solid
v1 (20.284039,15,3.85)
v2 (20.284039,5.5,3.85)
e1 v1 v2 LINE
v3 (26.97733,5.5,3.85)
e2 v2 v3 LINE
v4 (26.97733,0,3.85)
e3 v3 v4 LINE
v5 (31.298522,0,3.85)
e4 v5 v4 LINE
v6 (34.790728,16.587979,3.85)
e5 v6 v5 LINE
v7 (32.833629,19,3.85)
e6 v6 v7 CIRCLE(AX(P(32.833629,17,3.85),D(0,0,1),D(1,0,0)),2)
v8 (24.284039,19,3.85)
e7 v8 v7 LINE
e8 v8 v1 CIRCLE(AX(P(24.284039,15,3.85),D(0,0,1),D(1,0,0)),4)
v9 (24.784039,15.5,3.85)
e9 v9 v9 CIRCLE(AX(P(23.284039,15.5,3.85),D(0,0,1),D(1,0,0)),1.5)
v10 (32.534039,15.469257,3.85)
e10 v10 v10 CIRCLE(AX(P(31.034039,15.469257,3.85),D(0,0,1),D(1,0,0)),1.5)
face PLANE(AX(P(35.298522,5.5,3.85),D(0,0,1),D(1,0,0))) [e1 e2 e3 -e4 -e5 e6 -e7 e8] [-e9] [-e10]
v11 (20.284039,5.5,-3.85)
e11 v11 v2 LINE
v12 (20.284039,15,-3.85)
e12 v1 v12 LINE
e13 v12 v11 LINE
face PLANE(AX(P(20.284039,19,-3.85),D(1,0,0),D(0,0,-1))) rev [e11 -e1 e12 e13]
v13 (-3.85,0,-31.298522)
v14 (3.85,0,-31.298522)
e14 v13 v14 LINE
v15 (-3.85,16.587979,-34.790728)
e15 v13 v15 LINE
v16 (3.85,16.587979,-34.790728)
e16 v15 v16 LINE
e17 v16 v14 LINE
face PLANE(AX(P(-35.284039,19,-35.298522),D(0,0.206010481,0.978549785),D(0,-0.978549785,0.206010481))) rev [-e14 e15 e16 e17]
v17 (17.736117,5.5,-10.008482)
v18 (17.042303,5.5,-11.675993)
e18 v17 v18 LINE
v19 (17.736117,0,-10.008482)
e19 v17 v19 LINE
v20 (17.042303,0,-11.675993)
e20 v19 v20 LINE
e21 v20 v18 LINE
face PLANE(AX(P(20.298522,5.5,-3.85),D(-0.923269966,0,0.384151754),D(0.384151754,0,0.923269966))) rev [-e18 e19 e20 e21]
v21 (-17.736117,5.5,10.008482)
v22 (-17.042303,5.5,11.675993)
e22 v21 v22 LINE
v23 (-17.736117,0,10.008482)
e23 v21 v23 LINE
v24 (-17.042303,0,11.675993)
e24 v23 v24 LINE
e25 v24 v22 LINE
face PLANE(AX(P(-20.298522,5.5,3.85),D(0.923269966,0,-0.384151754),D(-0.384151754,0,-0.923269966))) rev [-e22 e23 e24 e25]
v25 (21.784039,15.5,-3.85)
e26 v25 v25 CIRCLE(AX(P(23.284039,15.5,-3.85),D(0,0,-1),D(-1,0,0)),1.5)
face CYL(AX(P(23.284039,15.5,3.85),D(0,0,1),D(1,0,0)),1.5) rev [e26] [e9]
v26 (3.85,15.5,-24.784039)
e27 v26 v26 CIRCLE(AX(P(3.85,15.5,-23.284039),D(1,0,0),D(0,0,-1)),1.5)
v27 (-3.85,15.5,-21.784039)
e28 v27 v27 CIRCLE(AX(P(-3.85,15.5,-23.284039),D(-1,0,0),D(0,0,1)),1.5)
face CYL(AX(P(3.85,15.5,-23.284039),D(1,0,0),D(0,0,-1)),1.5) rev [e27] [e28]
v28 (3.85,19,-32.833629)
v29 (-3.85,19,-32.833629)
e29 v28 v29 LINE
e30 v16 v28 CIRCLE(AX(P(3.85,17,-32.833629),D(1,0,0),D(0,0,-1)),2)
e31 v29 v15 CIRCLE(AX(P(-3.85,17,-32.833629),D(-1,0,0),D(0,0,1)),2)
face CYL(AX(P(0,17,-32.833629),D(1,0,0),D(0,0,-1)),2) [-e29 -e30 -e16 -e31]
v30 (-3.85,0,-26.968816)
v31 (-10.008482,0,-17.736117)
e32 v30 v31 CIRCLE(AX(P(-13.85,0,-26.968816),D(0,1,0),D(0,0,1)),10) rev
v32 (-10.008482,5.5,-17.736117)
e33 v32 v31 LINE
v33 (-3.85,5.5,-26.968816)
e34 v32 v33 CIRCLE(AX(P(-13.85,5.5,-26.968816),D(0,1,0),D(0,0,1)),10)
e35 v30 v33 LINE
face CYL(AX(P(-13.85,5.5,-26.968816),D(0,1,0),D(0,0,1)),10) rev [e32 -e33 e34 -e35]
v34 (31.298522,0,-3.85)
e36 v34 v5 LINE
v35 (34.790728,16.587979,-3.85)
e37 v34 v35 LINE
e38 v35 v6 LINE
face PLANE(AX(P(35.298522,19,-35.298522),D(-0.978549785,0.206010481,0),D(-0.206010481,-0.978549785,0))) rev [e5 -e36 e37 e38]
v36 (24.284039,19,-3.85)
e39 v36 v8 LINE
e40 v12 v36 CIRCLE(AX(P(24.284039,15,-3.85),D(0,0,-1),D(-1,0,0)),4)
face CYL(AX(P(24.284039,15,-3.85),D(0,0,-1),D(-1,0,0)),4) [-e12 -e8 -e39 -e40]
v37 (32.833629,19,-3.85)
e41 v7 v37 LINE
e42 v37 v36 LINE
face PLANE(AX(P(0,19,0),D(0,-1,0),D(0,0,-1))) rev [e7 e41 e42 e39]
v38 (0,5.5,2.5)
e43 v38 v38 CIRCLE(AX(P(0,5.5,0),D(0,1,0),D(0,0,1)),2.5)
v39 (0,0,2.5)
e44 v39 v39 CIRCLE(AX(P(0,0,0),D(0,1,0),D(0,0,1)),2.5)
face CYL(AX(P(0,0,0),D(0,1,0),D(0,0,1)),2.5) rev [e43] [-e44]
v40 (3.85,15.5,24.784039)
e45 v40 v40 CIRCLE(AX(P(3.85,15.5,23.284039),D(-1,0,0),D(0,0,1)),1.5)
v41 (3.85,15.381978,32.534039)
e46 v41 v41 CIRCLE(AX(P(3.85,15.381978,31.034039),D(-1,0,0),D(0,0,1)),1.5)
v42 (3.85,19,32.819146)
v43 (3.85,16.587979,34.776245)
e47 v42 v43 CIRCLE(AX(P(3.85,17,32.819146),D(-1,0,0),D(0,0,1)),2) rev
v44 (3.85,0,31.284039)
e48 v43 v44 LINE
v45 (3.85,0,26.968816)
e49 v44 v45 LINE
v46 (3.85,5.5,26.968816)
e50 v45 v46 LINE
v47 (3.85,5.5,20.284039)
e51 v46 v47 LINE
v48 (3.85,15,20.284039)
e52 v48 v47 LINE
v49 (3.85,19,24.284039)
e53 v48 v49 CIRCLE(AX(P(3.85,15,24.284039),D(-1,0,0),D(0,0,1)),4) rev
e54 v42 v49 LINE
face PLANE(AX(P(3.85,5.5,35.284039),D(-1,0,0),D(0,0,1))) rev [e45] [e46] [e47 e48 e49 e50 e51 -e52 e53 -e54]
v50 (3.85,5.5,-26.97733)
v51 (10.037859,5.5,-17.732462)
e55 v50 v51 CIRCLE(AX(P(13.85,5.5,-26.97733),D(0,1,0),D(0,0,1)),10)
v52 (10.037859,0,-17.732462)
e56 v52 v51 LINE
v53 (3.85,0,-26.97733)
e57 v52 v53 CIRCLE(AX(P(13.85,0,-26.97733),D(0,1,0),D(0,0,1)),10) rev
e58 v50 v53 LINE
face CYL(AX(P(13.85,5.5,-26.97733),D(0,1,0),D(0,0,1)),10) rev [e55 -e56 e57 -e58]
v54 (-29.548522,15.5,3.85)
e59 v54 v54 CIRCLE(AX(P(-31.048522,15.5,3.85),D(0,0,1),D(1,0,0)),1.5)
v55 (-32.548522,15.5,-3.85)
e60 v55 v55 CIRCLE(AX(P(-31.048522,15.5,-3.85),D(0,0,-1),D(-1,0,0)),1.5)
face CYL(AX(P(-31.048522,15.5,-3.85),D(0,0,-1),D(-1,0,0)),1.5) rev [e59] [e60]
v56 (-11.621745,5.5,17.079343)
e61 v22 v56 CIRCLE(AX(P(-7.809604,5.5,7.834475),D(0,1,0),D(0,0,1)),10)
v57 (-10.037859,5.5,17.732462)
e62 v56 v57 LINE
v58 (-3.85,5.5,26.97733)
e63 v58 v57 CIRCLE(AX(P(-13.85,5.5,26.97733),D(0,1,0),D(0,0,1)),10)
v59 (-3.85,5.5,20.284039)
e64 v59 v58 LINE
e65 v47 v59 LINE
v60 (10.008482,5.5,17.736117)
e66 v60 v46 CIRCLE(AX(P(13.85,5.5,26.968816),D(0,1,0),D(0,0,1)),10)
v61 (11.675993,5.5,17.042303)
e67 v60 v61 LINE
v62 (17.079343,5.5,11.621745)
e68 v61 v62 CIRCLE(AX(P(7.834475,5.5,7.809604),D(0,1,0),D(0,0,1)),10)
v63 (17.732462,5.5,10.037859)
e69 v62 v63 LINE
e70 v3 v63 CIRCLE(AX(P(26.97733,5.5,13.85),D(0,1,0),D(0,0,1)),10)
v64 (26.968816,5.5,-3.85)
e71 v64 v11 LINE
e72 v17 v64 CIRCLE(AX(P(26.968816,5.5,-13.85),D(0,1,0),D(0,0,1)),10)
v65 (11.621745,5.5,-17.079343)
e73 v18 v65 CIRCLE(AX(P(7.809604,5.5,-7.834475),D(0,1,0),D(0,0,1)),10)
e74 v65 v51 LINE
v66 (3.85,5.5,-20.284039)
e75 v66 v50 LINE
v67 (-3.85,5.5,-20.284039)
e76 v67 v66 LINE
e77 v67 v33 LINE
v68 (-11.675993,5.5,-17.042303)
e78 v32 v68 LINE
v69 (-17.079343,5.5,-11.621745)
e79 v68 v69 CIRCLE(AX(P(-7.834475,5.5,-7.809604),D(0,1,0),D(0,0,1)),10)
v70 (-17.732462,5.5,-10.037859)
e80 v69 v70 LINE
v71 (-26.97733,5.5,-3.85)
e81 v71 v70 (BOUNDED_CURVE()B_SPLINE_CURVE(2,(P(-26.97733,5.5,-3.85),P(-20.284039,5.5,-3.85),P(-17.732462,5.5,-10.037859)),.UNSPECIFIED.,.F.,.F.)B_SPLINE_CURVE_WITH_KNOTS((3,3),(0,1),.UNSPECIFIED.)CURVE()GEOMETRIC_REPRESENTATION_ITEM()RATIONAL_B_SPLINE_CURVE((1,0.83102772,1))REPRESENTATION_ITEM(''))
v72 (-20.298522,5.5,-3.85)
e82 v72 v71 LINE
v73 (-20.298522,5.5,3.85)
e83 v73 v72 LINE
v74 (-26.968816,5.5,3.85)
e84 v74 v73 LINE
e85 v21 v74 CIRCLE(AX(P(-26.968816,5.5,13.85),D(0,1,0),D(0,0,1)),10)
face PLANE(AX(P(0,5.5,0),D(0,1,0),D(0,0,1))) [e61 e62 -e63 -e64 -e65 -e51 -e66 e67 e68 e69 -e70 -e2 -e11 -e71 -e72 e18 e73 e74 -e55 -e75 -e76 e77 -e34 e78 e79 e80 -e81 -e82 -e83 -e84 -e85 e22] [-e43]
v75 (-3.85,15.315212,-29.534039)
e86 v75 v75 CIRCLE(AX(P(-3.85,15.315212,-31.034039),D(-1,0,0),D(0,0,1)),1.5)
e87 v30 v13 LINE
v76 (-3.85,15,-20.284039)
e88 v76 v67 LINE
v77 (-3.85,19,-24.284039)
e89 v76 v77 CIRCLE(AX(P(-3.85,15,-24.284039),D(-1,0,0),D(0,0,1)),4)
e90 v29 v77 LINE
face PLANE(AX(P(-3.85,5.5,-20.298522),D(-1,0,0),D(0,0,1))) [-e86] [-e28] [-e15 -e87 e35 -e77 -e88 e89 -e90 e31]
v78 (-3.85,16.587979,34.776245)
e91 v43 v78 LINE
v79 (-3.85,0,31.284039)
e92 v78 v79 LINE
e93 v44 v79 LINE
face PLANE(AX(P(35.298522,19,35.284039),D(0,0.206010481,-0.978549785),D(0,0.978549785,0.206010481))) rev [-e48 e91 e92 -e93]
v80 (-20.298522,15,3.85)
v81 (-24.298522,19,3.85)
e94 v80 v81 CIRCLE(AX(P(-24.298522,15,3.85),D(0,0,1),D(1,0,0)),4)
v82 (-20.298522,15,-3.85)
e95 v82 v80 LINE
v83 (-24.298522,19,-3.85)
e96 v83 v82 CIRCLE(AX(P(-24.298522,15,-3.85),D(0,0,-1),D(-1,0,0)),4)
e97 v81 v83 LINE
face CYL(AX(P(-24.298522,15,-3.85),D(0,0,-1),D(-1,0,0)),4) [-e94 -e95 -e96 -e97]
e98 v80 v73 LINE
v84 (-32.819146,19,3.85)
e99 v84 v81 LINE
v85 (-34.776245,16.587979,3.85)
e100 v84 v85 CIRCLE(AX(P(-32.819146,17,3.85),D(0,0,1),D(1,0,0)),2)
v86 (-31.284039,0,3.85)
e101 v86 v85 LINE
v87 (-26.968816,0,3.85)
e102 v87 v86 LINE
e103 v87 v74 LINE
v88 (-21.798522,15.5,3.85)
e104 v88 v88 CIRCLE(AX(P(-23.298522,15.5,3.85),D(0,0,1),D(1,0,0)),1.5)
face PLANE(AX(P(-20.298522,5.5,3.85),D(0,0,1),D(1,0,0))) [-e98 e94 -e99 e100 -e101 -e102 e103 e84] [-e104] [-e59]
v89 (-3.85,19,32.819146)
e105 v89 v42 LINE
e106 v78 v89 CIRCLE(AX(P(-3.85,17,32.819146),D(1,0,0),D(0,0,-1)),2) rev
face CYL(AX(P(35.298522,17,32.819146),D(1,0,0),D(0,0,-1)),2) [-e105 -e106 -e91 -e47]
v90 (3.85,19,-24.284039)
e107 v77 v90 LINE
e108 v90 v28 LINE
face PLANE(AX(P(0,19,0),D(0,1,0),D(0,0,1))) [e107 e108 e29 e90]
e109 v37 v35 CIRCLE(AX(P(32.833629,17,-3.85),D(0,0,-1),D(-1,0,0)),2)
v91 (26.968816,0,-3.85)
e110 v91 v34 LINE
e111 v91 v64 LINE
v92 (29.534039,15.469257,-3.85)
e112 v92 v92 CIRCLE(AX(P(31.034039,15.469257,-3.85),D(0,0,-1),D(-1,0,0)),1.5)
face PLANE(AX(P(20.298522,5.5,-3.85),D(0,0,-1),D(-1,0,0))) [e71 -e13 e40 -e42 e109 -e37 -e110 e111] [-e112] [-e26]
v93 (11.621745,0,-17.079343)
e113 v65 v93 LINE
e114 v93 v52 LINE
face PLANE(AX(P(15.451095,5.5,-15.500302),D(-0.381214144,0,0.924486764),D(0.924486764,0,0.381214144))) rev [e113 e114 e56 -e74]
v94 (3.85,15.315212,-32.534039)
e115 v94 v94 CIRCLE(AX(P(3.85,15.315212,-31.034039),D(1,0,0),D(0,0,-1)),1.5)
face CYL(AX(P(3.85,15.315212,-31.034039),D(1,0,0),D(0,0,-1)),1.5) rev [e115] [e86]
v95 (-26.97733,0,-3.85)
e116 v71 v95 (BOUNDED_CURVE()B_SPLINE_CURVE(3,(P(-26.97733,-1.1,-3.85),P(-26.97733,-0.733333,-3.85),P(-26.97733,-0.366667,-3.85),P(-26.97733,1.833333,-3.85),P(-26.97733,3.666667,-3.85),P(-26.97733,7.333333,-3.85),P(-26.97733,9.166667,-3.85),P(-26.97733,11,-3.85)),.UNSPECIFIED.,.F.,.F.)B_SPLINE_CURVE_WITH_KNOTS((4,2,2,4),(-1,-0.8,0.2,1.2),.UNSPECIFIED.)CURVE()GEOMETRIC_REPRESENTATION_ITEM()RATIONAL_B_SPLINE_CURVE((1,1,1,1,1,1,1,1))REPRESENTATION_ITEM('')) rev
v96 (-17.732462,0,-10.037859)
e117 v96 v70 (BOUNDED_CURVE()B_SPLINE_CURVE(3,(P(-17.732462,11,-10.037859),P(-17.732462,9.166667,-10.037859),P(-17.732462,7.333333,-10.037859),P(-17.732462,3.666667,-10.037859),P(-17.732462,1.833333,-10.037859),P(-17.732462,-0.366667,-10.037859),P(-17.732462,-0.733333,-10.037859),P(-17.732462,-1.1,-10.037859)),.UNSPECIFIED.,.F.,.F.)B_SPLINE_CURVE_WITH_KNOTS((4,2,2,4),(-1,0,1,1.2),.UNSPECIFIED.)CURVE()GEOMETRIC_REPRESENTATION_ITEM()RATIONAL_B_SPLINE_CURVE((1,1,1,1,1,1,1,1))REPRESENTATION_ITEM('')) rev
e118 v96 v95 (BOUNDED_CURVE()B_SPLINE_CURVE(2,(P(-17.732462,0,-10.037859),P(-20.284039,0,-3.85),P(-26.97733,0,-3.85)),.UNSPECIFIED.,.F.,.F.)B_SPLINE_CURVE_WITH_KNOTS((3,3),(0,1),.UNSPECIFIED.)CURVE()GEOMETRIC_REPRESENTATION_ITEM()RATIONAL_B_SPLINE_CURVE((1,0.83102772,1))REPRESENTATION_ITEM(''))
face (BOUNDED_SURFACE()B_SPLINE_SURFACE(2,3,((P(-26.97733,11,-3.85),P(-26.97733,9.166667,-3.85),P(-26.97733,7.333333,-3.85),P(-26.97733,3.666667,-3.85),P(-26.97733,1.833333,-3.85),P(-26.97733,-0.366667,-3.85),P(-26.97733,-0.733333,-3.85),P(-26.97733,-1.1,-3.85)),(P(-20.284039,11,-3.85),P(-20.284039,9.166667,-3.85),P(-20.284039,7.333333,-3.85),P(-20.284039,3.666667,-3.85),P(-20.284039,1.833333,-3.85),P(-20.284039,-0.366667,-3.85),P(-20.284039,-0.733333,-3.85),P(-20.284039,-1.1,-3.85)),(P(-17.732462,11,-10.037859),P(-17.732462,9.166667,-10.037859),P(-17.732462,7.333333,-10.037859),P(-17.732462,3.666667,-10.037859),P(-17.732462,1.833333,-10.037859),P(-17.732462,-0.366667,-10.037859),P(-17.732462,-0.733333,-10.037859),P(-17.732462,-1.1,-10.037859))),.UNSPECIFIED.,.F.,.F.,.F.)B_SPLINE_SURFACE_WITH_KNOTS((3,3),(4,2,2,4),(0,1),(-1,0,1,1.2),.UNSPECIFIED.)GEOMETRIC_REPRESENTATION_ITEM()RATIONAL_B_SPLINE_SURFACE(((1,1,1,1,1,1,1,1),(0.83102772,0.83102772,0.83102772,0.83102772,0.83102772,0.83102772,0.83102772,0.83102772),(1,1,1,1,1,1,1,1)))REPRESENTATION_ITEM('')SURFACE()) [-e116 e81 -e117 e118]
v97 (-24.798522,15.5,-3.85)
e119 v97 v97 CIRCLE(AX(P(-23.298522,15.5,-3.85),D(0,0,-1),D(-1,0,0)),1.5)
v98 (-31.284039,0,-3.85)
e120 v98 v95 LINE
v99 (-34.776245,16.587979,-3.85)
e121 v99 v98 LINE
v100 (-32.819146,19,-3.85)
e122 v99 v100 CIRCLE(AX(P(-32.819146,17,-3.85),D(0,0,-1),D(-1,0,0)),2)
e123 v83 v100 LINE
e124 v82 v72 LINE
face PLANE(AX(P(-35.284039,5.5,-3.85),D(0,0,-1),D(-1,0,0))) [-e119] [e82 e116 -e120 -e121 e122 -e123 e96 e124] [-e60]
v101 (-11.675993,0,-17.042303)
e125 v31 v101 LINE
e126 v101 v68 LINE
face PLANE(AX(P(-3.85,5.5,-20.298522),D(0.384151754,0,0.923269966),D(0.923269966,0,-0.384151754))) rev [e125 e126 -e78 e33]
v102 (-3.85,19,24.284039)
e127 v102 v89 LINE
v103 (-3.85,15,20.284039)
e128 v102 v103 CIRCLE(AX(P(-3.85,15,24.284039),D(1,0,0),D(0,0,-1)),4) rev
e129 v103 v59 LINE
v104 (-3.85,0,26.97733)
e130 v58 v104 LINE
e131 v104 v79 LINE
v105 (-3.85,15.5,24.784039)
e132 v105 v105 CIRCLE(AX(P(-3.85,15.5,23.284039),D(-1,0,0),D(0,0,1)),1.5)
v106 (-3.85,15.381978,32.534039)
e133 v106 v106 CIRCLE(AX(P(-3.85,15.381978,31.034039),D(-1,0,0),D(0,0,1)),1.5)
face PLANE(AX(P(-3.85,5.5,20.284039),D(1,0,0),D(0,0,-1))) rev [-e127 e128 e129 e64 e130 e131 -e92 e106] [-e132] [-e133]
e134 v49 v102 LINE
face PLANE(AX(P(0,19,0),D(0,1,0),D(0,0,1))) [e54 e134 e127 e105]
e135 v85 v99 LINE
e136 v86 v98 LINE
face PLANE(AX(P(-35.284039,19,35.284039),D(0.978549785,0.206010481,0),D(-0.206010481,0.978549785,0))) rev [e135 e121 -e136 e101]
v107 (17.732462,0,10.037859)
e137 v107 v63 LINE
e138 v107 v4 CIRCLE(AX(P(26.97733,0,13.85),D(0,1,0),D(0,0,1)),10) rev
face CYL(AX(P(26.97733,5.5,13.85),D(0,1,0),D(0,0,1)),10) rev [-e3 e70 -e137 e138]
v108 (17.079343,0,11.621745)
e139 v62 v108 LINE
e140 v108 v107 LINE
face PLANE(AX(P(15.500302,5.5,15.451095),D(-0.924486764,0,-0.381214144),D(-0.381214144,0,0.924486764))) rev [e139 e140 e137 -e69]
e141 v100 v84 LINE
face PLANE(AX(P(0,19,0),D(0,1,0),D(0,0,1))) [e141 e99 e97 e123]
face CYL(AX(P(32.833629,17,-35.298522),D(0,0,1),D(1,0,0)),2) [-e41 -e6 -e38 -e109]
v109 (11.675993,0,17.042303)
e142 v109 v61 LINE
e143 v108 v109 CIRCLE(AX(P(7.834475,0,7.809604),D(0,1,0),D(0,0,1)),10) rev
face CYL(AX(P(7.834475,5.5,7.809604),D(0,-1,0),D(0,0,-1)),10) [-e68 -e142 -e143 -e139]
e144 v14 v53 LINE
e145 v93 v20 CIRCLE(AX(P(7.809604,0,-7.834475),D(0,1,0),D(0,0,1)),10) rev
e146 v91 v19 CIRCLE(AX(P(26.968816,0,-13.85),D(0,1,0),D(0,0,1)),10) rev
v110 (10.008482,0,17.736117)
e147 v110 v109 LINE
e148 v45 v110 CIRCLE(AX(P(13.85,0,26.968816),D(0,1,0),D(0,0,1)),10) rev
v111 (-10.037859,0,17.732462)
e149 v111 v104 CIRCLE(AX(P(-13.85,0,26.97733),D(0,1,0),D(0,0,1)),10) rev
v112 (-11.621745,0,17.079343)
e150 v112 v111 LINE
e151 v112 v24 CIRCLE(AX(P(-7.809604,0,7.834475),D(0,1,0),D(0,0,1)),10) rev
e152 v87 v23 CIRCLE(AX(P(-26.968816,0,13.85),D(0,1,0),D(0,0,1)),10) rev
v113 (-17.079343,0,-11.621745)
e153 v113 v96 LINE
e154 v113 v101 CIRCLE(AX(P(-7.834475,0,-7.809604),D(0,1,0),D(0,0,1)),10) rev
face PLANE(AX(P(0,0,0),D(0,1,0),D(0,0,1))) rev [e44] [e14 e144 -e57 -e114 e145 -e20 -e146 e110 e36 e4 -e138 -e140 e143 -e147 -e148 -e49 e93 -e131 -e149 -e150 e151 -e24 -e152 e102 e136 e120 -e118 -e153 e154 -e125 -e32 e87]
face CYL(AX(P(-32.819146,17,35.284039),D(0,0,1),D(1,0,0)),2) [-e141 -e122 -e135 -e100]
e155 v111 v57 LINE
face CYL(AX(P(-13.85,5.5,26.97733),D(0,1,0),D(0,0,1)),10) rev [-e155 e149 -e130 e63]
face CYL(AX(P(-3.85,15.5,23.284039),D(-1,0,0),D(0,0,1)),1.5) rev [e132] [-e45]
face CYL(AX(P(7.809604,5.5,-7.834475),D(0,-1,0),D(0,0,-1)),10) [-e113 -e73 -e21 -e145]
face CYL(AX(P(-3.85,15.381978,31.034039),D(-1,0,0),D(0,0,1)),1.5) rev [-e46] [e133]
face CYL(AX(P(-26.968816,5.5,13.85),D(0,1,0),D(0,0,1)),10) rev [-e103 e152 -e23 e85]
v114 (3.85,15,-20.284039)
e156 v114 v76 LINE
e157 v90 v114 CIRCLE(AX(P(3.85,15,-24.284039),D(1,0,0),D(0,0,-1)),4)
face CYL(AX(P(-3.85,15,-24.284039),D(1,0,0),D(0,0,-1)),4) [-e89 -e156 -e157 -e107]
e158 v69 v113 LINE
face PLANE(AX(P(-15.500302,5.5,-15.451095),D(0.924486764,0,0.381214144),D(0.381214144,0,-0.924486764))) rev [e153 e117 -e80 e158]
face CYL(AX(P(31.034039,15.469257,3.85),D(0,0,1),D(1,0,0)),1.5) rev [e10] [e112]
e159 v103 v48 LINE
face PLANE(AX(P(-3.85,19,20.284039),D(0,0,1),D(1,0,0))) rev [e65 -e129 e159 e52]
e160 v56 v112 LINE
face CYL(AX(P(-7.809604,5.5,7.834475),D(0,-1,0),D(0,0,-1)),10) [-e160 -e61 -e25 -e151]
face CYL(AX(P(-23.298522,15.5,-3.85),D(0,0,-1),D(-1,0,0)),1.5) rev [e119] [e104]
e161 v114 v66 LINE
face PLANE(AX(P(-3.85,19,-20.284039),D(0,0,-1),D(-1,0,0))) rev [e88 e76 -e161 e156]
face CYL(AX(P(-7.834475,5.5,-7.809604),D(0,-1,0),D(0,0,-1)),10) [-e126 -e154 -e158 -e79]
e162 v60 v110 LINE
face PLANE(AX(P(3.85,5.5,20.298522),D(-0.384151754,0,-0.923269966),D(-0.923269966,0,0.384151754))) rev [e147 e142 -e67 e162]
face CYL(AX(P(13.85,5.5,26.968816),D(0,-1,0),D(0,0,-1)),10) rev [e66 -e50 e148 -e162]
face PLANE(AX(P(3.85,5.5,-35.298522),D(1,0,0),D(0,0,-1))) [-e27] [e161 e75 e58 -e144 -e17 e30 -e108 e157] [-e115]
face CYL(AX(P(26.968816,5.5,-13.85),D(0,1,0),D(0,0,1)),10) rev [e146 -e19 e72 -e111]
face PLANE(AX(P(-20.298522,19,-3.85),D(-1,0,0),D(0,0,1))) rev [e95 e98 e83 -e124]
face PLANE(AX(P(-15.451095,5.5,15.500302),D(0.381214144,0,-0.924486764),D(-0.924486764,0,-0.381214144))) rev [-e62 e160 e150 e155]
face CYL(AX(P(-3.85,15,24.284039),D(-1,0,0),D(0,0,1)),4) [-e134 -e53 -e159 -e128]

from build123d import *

# Parameters (mm, degrees)
BOSS_EXTRUSION_DEPTH     = 5.5
SCHIZZO2_W               = 14.985516936
SCHIZZO2_H               = 7.7
SCHIZZO2_W_2             = 7.7
SCHIZZO2_H_2             = 15.014483064
SCHIZZO2_W_3             = 15.014483064
SCHIZZO2_H_3             = 15
EXTERNAL_EXTRUSION_DEPTH = 13.5
SCHIZZO3_R               = 2.5
CETRAL_HOLE_DEPTH        = 52.71287379
TAGLIO_ESTRUSIONE2_DEPTH = 57.032066134
TAGLIO_ESTRUSIONE3_DEPTH = 57.021948056
TAGLIO_ESTRUSIONE4_DEPTH = 57.021948056
TAGLIO_ESTRUSIONE5_DEPTH = 57.032066134
FORO_PER_VITE_M4_1_D     = 3
FORO_PER_VITE_M4_2_D     = 3
FORO_PER_VITE_M4_3_D     = 3
FORO_PER_VITE_M4_4_D     = 3
RACCORDO1_R              = 4
RACCORDO2_R              = 4
RACCORDO3_R              = 4
RACCORDO4_R              = 4
RACCORDO5_R              = 2
RACCORDO6_R              = 2
RACCORDO7_R              = 2
RACCORDO8_R              = 2
RACCORDO9_R              = 10
RACCORDO17_R             = 10
RACCORDO18_R             = 10
RACCORDO19_R             = 10
RACCORDO20_R             = 10
RACCORDO21_R             = 10
RACCORDO22_DEPTH         = 5.5
RACCORDO23_R             = 10
RACCORDO24_R             = 10
RACCORDO25_R             = 10


with BuildPart() as part:
    # Schizzo1 → Boss extrusion (new body)
    with BuildSketch(Plane(origin=(0, 0, 0), x_dir=(1, 0, 0), z_dir=(0, 1, 0))):
        Polygon((-3.85, -20.28403897), (-3.85, -35.28403897), (3.85, -35.28403897), (3.85, -20.298522034), (15.500302101, -15.451094793), (20.28403897, -3.85), (35.298522034, -3.85), (35.298522034, 3.85), (20.298522034, 3.85), (15.451094793, 15.500302101), (3.85, 20.28403897), (3.85, 35.298522034), (-3.85, 35.298522034), (-3.85, 20.298522034), (-15.500302101, 15.451094793), (-20.28403897, 3.85), (-35.28403897, 3.85), (-35.28403897, -3.85), (-20.298522034, -3.85), (-15.451094793, -15.500302101), align=None)
    extrude(amount=BOSS_EXTRUSION_DEPTH)

    # Schizzo2 → external extrusion (add)
    with BuildSketch(Plane(origin=(0, 5.5, 0), x_dir=(1, 0, 0), z_dir=(0, 1, 0))):
        with Locations((-27.791280502, 0)):
            Rectangle(SCHIZZO2_W, SCHIZZO2_H)
        with Locations((0, 27.791280502)):
            Rectangle(SCHIZZO2_W_2, SCHIZZO2_H_2)
        with Locations((27.791280502, 0)):
            Rectangle(SCHIZZO2_W_3, SCHIZZO2_H)
        with Locations((0, -27.78403897)):
            Rectangle(SCHIZZO2_W_2, SCHIZZO2_H_3)
    extrude(amount=EXTERNAL_EXTRUSION_DEPTH)

    # Schizzo3 → cetral hole (cut, through all)
    with BuildSketch(Plane(origin=(0, 5.5, 0), x_dir=(1, 0, 0), z_dir=(0, 1, 0))):
        with Locations(Location((0, 0, 0), (0, 0, 270))):
            Circle(SCHIZZO3_R)
    extrude(amount=-CETRAL_HOLE_DEPTH, mode=Mode.SUBTRACT)

    # Schizzo4 → Taglio-Estrusione2 (cut, through all)
    with BuildSketch(Plane.XY.offset(3.85)):
        Polygon((35.298522034, 0), (35.298522034, 19), (31.298522034, 0), align=None)
    extrude(amount=-TAGLIO_ESTRUSIONE2_DEPTH, mode=Mode.SUBTRACT)

    # Schizzo5 → Taglio-Estrusione3 (cut, through all)
    with BuildSketch(Plane(origin=(3.85, 0, 0), x_dir=(0, 0, -1), z_dir=(1, 0, 0))):
        Polygon((35.298522034, 0), (35.298522034, 19), (31.298522034, 0), align=None)
    extrude(amount=-TAGLIO_ESTRUSIONE3_DEPTH, mode=Mode.SUBTRACT)

    # Schizzo8 → Taglio-Estrusione4 (cut, through all)
    with BuildSketch(Plane(origin=(0, 0, -3.85), x_dir=(-1, 0, 0), z_dir=(0, 0, -1))):
        Polygon((35.28403897, 0), (35.28403897, 19), (31.28403897, 0), align=None)
    extrude(amount=-TAGLIO_ESTRUSIONE4_DEPTH, mode=Mode.SUBTRACT)

    # Schizzo9 → Taglio-Estrusione5 (cut, through all)
    with BuildSketch(Plane.ZY.offset(3.85)):
        Polygon((35.28403897, 0), (35.28403897, 19), (31.28403897, 0), align=None)
    extrude(amount=-TAGLIO_ESTRUSIONE5_DEPTH, mode=Mode.SUBTRACT)

    # Foro per Vite M4-1 (through all)
    with Locations(Plane.ZY.offset(3.85)):
        with Locations((23.28403897, 15.5), (31.03403897, 15.381977535)):
            Hole(FORO_PER_VITE_M4_1_D / 2)

    # Foro per Vite M4-2 (through all)
    with Locations(Plane.XY.offset(3.85)):
        with Locations((23.28403897, 15.5), (31.03403897, 15.469257355)):
            Hole(FORO_PER_VITE_M4_2_D / 2)

    # Foro per Vite M4-3 (through all)
    with Locations(Plane(origin=(3.85, 0, 0), x_dir=(0, 0, -1), z_dir=(1, 0, 0))):
        with Locations((23.28403897, 15.5), (31.03403897, 15.315212004)):
            Hole(FORO_PER_VITE_M4_3_D / 2)

    # Foro per Vite M4-4 (through all)
    with Locations(Plane(origin=(0, 0, -3.85), x_dir=(-1, 0, 0), z_dir=(0, 0, -1))):
        with Locations((23.298522034, 15.5), (31.048522034, 15.5)):
            Hole(FORO_PER_VITE_M4_4_D / 2)

    # Raccordo1
    raccordo1_edges = [part.edges().sort_by_distance(p)[0] for p in [
        (20.28403897, 19, 0),
    ]]
    fillet(raccordo1_edges, radius=RACCORDO1_R)

    # Raccordo2
    raccordo2_edges = [part.edges().sort_by_distance(p)[0] for p in [
        (0, 19, -20.28403897),
    ]]
    fillet(raccordo2_edges, radius=RACCORDO2_R)

    # Raccordo3
    raccordo3_edges = [part.edges().sort_by_distance(p)[0] for p in [
        (-20.298522034, 19, 0),
    ]]
    fillet(raccordo3_edges, radius=RACCORDO3_R)

    # Raccordo4
    raccordo4_edges = [part.edges().sort_by_distance(p)[0] for p in [
        (0, 19, 20.28403897),
    ]]
    fillet(raccordo4_edges, radius=RACCORDO4_R)

    # Raccordo5
    raccordo5_edges = [part.edges().sort_by_distance(p)[0] for p in [
        (-35.28403897, 19, 0),
    ]]
    fillet(raccordo5_edges, radius=RACCORDO5_R)

    # Raccordo6
    raccordo6_edges = [part.edges().sort_by_distance(p)[0] for p in [
        (0, 19, -35.298522034),
    ]]
    fillet(raccordo6_edges, radius=RACCORDO6_R)

    # Raccordo7
    raccordo7_edges = [part.edges().sort_by_distance(p)[0] for p in [
        (35.298522034, 19, 0),
    ]]
    fillet(raccordo7_edges, radius=RACCORDO7_R)

    # Raccordo8
    raccordo8_edges = [part.edges().sort_by_distance(p)[0] for p in [
        (0, 19, 35.28403897),
    ]]
    fillet(raccordo8_edges, radius=RACCORDO8_R)

    # Raccordo9
    raccordo9_edges = [part.edges().sort_by_distance(p)[0] for p in [
        (3.85, 2.75, 20.298522034),
    ]]
    fillet(raccordo9_edges, radius=RACCORDO9_R)

    # Raccordo17
    raccordo17_edges = [part.edges().sort_by_distance(p)[0] for p in [
        (-3.85, 2.75, 20.28403897),
    ]]
    fillet(raccordo17_edges, radius=RACCORDO17_R)

    # Raccordo18
    raccordo18_edges = [part.edges().sort_by_distance(p)[0] for p in [
        (20.28403897, 2.75, 3.85),
    ]]
    fillet(raccordo18_edges, radius=RACCORDO18_R)

    # Raccordo19
    raccordo19_edges = [part.edges().sort_by_distance(p)[0] for p in [
        (20.298522034, 2.75, -3.85),
    ]]
    fillet(raccordo19_edges, radius=RACCORDO19_R)

    # Raccordo20
    raccordo20_edges = [part.edges().sort_by_distance(p)[0] for p in [
        (3.85, 2.75, -20.28403897),
    ]]
    fillet(raccordo20_edges, radius=RACCORDO20_R)

    # Raccordo21
    raccordo21_edges = [part.edges().sort_by_distance(p)[0] for p in [
        (-3.85, 2.75, -20.298522034),
    ]]
    fillet(raccordo21_edges, radius=RACCORDO21_R)

    # Raccordo22: read off the stored shape, not the designer's step
    # Raccordo22 outline → Raccordo22 (add)
    with BuildSketch(Plane(origin=(0, 0, 0), x_dir=(1, 0, 0), z_dir=(0, 1, 0))):
        with BuildLine():
            add(Edge.make_bspline(
                [(-26.977329566, 3.85), (-20.28403897, 3.85), (-17.732461927, 10.037858563)],
                knots=[0, 0, 0, 1, 1, 1], degree=2, weights=[1, 0.83102772, 1]))
            Line((-26.977329566, 3.85), (-20.28403897, 3.85))
            Line((-20.28403897, 3.85), (-17.732461927, 10.037858563))
        make_face()
    extrude(amount=RACCORDO22_DEPTH)

    # Raccordo23
    raccordo23_edges = [part.edges().sort_by_distance(p)[0] for p in [
        (-20.298522034, 2.75, 3.85),
    ]]
    fillet(raccordo23_edges, radius=RACCORDO23_R)

    # Raccordo24
    raccordo24_edges = [part.edges().sort_by_distance(p)[0] for p in [
        (-15.451094793, 2.75, 15.500302101),
    ]]
    fillet(raccordo24_edges, radius=RACCORDO24_R)

    # Raccordo25
    raccordo25_edges = [part.edges().sort_by_distance(p)[0] for p in [
        (-15.500302101, 2.75, -15.451094793),
        (15.451094793, 2.75, -15.500302101),
        (15.500302101, 2.75, 15.451094793),
    ]]
    fillet(raccordo25_edges, radius=RACCORDO25_R)


solid = part.part
